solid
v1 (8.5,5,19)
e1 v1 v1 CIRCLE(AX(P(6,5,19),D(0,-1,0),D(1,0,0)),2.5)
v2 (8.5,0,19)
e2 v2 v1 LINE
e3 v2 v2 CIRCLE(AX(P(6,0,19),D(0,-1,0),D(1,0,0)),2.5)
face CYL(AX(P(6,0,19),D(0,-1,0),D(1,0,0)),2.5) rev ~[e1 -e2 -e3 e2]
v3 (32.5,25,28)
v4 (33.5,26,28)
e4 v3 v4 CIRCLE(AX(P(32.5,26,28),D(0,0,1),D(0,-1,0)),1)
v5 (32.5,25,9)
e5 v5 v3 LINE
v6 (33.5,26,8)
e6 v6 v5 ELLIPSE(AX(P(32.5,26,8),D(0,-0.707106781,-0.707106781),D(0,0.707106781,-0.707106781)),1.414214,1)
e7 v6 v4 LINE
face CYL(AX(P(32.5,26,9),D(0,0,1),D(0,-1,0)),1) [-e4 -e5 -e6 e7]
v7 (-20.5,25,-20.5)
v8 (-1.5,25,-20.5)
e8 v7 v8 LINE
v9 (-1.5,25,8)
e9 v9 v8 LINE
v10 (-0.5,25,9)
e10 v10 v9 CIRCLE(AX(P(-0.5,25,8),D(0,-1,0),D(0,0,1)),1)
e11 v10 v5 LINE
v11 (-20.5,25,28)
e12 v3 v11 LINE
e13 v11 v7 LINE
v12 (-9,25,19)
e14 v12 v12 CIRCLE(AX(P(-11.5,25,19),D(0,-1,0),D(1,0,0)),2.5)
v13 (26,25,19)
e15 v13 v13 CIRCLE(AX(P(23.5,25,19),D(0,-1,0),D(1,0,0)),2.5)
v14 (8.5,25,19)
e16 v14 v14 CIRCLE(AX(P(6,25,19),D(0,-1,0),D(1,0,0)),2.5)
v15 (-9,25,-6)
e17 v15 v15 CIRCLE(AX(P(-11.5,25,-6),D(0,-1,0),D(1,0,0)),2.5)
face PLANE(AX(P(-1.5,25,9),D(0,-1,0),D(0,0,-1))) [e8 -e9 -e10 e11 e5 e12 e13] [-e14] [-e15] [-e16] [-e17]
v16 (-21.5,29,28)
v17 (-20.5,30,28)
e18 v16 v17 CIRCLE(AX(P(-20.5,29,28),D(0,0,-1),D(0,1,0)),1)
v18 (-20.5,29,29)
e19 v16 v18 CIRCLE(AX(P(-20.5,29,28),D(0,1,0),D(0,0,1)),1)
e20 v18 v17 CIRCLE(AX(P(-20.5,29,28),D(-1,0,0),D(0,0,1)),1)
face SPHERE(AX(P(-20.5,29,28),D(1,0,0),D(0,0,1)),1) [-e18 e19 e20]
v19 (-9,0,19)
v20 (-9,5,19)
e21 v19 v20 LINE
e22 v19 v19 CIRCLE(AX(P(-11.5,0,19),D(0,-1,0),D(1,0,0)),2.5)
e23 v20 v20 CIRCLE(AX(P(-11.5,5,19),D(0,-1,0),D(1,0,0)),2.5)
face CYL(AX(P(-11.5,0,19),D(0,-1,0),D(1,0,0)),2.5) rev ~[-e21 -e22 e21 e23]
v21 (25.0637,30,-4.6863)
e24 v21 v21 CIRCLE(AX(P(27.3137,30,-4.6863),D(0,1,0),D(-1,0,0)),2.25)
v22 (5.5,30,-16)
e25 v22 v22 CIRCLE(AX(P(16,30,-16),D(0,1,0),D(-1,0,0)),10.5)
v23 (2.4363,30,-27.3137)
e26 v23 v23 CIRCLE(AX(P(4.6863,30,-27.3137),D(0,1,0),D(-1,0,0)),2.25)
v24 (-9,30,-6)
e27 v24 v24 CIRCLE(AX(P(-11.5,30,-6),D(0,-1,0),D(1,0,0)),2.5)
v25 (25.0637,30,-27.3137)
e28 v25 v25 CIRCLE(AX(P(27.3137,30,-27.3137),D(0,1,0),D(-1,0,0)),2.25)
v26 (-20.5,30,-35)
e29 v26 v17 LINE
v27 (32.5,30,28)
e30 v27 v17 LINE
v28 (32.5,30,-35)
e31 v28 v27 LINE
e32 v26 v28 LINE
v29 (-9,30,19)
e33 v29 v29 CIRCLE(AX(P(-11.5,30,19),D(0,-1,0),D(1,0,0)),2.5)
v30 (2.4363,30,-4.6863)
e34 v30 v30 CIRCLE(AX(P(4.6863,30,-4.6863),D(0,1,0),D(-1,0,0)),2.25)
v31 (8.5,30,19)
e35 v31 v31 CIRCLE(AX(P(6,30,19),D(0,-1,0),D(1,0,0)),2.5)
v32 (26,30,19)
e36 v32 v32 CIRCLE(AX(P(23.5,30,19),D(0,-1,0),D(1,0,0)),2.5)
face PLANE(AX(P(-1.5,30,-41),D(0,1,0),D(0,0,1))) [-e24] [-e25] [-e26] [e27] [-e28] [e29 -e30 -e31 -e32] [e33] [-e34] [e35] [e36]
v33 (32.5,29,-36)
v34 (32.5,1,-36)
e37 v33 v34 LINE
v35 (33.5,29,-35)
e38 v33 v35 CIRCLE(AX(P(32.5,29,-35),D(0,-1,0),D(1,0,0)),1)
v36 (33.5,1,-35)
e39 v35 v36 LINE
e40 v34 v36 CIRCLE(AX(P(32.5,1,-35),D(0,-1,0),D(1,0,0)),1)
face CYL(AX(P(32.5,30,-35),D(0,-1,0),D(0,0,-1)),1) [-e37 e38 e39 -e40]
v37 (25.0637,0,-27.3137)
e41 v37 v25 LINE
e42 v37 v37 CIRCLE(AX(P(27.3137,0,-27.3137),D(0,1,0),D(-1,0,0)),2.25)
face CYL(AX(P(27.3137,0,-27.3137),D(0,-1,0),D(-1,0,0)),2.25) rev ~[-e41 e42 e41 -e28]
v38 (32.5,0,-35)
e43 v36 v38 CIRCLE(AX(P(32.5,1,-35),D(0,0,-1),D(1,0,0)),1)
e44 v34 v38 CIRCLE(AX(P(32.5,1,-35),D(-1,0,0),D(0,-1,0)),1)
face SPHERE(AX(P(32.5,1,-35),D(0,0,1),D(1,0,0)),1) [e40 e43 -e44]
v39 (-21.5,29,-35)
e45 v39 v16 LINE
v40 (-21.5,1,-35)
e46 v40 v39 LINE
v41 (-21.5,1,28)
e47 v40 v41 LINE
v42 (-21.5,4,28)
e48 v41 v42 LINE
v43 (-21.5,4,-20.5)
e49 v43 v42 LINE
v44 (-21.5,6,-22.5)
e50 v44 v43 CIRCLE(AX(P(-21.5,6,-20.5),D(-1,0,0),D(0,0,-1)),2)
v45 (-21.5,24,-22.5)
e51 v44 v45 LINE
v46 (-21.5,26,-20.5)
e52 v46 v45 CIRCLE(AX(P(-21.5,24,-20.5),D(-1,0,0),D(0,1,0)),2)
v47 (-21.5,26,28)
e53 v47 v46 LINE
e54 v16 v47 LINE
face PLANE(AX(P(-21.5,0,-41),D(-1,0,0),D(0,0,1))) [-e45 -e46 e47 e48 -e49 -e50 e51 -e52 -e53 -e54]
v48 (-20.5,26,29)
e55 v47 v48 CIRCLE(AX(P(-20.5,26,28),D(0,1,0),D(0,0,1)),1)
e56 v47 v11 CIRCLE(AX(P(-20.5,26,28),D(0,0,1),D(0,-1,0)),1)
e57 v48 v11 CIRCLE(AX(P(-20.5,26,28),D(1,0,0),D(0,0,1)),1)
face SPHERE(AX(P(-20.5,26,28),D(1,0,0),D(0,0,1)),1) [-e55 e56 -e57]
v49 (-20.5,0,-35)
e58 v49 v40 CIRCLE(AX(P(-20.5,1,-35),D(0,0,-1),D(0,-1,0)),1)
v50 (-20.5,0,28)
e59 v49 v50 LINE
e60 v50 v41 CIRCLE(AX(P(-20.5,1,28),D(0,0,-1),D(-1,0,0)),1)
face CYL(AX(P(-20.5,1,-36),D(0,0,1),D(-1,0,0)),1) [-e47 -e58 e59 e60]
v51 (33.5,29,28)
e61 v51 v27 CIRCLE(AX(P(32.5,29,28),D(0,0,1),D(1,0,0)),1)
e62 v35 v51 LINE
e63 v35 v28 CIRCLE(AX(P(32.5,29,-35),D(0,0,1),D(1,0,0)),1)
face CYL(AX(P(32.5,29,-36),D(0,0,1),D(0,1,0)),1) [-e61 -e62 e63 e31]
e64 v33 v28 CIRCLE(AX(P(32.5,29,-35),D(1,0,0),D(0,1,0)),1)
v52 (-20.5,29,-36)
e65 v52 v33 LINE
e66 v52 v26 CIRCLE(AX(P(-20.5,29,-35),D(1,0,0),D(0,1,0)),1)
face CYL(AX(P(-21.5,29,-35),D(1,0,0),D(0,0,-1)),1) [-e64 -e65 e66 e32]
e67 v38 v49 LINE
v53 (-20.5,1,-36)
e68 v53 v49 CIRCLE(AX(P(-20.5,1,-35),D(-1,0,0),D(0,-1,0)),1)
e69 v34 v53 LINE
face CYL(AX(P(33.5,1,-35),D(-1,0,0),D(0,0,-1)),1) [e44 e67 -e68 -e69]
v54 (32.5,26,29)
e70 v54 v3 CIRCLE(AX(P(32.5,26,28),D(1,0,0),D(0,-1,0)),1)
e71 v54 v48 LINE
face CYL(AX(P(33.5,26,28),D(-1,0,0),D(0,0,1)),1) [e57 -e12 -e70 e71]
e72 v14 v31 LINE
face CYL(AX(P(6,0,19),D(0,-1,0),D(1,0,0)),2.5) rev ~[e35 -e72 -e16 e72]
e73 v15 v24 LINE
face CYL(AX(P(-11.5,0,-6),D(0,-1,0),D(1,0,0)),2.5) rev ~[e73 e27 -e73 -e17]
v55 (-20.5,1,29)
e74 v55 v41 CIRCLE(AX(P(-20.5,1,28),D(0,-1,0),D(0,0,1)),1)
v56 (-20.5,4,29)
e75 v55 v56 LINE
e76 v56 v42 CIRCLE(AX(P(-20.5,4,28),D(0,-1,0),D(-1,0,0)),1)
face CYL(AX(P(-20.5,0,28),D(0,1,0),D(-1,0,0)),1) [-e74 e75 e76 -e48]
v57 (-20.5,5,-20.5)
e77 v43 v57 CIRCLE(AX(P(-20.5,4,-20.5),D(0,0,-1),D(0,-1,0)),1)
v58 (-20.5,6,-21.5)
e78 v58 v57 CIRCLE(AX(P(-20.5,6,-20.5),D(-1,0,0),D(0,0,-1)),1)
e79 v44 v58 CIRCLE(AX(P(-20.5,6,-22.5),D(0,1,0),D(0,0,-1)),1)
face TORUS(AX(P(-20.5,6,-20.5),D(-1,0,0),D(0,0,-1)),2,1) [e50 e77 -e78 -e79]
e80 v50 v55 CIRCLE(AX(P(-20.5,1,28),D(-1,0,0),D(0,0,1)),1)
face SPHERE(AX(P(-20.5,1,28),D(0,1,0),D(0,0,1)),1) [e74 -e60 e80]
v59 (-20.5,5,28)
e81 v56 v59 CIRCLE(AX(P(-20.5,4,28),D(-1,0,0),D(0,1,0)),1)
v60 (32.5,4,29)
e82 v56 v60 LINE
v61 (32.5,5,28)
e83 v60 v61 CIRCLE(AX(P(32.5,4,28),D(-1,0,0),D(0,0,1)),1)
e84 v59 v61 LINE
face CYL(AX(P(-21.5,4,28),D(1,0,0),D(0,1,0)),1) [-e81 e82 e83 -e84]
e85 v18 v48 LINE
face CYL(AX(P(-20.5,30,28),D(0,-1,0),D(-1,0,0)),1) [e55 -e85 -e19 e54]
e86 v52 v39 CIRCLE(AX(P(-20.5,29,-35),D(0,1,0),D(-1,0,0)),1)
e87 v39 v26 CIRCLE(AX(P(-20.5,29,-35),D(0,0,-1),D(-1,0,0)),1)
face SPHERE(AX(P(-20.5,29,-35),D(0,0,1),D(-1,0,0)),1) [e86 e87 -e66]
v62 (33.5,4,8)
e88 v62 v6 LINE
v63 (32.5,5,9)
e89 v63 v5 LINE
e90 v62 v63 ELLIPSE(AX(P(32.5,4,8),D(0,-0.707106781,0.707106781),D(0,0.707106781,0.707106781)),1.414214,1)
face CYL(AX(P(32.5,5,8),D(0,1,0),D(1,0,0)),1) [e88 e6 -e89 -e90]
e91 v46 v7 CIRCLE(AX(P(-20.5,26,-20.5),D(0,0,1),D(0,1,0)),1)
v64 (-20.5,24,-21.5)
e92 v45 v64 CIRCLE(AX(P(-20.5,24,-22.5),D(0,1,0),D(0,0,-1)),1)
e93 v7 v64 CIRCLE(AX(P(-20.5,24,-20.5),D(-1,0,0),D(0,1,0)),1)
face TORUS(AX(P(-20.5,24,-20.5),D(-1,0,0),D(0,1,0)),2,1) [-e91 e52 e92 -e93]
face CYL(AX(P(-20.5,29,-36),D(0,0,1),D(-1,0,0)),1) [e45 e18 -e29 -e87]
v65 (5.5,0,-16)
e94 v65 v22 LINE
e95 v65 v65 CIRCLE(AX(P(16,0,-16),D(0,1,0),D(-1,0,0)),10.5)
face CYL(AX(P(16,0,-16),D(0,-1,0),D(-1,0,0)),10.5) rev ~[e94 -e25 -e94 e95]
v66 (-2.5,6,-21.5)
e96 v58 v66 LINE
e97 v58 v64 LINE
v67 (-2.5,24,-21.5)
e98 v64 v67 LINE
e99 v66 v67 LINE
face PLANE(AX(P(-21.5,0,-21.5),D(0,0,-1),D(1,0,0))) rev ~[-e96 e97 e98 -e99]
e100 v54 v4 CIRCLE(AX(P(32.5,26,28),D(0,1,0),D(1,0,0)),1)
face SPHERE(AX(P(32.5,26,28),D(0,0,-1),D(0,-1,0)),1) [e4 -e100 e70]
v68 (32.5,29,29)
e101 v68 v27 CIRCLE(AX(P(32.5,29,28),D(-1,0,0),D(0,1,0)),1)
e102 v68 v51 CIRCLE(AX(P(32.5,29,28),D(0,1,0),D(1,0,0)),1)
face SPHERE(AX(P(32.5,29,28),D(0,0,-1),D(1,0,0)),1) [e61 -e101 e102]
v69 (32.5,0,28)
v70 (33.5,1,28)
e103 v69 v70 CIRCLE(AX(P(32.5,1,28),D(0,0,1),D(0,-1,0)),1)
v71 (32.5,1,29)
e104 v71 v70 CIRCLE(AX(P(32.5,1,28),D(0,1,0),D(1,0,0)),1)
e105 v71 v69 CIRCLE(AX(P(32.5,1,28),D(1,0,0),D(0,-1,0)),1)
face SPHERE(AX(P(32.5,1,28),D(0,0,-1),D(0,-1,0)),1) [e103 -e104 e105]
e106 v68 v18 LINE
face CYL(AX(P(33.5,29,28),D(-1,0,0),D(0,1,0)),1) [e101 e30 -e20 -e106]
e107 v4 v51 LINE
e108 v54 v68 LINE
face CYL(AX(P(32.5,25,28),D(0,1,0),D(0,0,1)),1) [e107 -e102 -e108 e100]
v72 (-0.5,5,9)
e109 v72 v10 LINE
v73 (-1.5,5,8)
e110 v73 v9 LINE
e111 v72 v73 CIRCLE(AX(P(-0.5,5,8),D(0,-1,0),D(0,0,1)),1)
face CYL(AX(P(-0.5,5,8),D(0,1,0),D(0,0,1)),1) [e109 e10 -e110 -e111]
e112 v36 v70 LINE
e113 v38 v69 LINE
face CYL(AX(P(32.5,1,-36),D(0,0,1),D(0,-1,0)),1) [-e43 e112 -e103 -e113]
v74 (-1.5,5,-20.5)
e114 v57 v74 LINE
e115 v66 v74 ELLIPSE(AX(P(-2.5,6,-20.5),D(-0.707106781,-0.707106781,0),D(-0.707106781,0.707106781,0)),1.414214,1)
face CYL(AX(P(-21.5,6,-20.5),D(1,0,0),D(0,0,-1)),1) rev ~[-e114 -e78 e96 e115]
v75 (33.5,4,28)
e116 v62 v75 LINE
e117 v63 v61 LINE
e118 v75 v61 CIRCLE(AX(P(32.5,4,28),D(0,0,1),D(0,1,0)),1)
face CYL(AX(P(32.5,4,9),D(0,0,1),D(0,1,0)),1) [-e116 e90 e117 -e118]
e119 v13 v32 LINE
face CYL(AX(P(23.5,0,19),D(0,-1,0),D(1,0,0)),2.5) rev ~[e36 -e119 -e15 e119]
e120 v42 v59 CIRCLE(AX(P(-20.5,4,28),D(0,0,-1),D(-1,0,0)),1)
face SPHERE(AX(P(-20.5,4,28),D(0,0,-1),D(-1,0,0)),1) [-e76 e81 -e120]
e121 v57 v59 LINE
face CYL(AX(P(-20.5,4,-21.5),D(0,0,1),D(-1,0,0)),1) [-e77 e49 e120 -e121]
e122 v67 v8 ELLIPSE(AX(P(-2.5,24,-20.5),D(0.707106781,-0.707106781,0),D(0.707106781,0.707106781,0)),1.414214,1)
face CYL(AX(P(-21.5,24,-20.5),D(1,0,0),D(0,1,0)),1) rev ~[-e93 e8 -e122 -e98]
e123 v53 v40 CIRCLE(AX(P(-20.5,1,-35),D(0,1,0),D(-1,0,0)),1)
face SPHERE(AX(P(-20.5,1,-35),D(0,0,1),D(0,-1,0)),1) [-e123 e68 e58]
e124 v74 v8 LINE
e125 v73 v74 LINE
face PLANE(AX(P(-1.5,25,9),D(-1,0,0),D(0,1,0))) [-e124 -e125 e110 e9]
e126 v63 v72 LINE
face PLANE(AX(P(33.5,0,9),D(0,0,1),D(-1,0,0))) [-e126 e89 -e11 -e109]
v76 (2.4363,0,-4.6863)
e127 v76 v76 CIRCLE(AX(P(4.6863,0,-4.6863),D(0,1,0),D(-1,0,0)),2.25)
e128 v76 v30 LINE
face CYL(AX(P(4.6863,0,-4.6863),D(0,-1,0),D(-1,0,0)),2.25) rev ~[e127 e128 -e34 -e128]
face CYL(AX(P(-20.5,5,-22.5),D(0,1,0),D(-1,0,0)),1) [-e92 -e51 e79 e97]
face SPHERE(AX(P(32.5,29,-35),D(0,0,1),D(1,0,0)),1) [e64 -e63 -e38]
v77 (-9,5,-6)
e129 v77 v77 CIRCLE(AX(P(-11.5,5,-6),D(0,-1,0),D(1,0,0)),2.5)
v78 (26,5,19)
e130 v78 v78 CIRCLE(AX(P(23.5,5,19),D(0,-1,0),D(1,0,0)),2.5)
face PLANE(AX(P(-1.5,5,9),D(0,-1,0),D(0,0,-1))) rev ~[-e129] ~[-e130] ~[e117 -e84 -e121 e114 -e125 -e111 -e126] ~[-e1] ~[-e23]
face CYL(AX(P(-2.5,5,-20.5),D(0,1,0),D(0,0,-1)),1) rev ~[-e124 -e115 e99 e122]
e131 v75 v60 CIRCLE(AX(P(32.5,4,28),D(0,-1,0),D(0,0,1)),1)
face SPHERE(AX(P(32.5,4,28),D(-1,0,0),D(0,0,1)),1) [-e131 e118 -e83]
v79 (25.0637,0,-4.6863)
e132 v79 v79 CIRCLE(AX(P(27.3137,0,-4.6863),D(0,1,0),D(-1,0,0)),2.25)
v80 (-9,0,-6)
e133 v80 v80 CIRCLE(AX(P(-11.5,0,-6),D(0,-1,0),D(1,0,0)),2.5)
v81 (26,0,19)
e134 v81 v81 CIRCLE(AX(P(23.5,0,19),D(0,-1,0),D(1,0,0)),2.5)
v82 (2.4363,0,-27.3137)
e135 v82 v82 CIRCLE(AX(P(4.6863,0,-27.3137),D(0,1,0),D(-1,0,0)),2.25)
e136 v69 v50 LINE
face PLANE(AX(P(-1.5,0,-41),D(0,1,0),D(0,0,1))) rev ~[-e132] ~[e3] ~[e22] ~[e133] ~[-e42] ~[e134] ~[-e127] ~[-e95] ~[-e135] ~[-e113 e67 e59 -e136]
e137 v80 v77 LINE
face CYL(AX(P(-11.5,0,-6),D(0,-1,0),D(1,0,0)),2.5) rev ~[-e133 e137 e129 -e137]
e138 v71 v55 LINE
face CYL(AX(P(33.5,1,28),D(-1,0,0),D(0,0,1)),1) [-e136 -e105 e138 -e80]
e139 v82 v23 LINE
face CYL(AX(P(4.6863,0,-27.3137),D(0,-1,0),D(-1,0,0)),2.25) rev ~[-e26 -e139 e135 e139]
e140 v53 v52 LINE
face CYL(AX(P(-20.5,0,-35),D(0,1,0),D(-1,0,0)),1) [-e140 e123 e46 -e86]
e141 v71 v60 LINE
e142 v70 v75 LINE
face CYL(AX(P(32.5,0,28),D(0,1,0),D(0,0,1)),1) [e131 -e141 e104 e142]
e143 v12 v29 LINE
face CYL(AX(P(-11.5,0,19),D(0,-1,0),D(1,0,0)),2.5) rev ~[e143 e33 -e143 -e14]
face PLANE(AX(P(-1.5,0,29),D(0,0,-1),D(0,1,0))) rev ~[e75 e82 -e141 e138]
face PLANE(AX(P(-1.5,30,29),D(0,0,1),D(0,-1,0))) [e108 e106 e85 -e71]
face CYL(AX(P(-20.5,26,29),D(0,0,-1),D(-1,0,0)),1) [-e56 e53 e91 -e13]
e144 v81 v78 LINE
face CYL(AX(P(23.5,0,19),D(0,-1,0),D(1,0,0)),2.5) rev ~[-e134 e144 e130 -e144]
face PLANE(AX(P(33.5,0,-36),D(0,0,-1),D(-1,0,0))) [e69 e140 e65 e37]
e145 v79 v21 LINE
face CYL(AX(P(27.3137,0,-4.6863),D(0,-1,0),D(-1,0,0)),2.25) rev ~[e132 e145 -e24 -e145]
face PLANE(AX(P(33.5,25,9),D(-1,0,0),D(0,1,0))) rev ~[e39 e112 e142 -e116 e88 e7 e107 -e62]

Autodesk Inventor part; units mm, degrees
ref_plane "YZ Plane" through (0, 0, 0) normal (1, 0, 0) x (0, 1, 0)
ref_plane "XZ Plane" through (0, 0, 0) normal (0, 1, 0) x (-1, 0, 0)
ref_plane "XY Plane" through (0, 0, 0) normal (0, 0, 1) x (1, 0, 0)
sketch "Sketch1" plane through (0, 0, 0) normal (0, 1, 0) x (-1, 0, 0)
  line L0 (-2, 0) -> (-30, 0)
  line L1 (-32, -2) -> (-32, -30)
  line L2 (-30, -32) -> (-2, -32)
  line L3 (0, -30) -> (0, -2)
  circle A0 centre (-16, -16) radius 10.5
  line L4 (1.5, -41) -> (-33.5, -41)
  line L5 (-33.5, -41) -> (-33.5, 9)
  line L6 (-33.5, 9) -> (1.5, 9)
  line L7 (1.5, 9) -> (1.5, -41)
  line L8 (1.5, -41) -> (-33.5, 9) construction
  line L9 (-33.5, -41) -> (1.5, 9) construction
  circle A1 centre (-16, -16) radius 16 construction
  line L10 (-2, -32) -> (0, -30)
  line L11 (0, -2) -> (-2, 0)
  line L12 (-30, 0) -> (-32, -2)
  line L13 (-30, -32) -> (-32, -30)
  line L14 (-16, -16) -> (0, 0) construction
  line L15 (-16, -16) -> (-32, 0) construction
  line L16 (-16, -16) -> (-32, -32) construction
  circle A2 centre (-27.3137, -27.3137) radius 2.25
  line L17 (-16, -16) -> (0, -32) construction
  circle A3 centre (-4.6863, -27.3137) radius 2.25
  circle A4 centre (-4.6863, -4.6863) radius 2.25
  circle A5 centre (-27.3137, -4.6863) radius 2.25
  line L18 (1.5, -41) -> (21.5, -41)
  line L19 (21.5, -41) -> (21.5, -21.5)
  line L20 (21.5, -21.5) -> (1.5, -21.5)
  line L21 (1.5, -21.5) -> (1.5, -41)
  point P0 (-33.5, -36)
  point P1 (1.5, -36)
  dimension "d0" = 32
  dimension "d1" = 32
  dimension "d2" = 21
  dimension "d3" = 16
  dimension "d4" = 16
  dimension "d5" = 35
  dimension "d6" = 50
  dimension "d10" = 32
  dimension "d15" = 2
  dimension "d16" = 2
  dimension "d17" = 2
  dimension "d18" = 2
  dimension "d19" = 2
  dimension "d20" = 2
  dimension "d21" = 2
  dimension "d22" = 2
  dimension "d56" = 4.5
  dimension "d57" = 4.5
  dimension "d58" = 4.5
  dimension "d59" = 4.5
  dimension "d63" = 20
  dimension "d64" = 19.5
extrude "Extrusion1" add sketch "Sketch1" along normal blind 30 contours L11 L3 L10 L2 L13 L1 L12 L0 | L4 L5 L6 L7
sketch "Sketch3" plane through (-1.5, 0, 9) normal (0, 0, 1) x (1, 0, 0)
  line L0 (35, 0) -> (35, 30) projected
  line L1 (0, 0) -> (35, 0)
  line L2 (35, 0) -> (35, 5)
  line L3 (35, 5) -> (0, 5)
  line L4 (0, 5) -> (0, 0)
  point P0 (1.5, 0)
  dimension "d27" = 5
extrude "Extrusion2" add sketch "Sketch3" along normal blind 20
sketch "Sketch4" plane through (-1.5, 0, -41) normal (-1, 0, 0) x (0, 0, 1)
  line L0 (0, 0) -> (0, 30) projected
  line L1 (50, 5) -> (70, 5) projected
  line L2 (0, 0) -> (70, 0)
  line L3 (70, 0) -> (70, 5)
  line L4 (70, 5) -> (0, 5)
  line L5 (0, 5) -> (0, 0)
  point P0 (41, 0)
extrude "Extrusion3" add sketch "Sketch4" along normal blind 20
sketch "Sketch5" plane through (-1.5, 30, 9) normal (0, 0, 1) x (1, 0, 0)
  line L0 (35, 0) -> (0, 0) projected
  line L1 (0, -25) -> (0, 0) projected
  line L2 (35, 0) -> (0, 0)
  line L3 (0, 0) -> (0, -5)
  line L4 (0, -5) -> (35, -5)
  line L5 (35, -5) -> (35, 0)
  point P0 (1.5, -30)
  dimension "d33" = 5
extrude "Extrusion4" add sketch "Sketch5" along normal blind 20
sketch "Sketch6" plane through (-1.5, 5, -41) normal (-1, 0, 0) x (0, 0, 1)
  line L0 (50, 20) -> (70, 20) projected
  line L1 (0, 0) -> (0, 25) projected
  line L2 (70, 20) -> (0, 20)
  line L3 (0, 20) -> (0, 25)
  line L4 (0, 25) -> (70, 25)
  line L5 (70, 25) -> (70, 20)
  point P0 (41, -5)
extrude "Extrusion5" add sketch "Sketch6" along normal blind 20
sketch "Sketch7" plane through (0, 0, 0) normal (0, -1, 0) x (1, 0, 0)
  circle A0 centre (-11.5, 19) radius 2.5
  circle A1 centre (6, 19) radius 2.5
  circle A2 centre (23.5, 19) radius 2.5
  circle A3 centre (-11.5, -6) radius 2.5
  line L0 (33.5, 29) -> (-21.5, 29) construction
  line L1 (33.5, -41) -> (33.5, 29) construction
  line L2 (-21.5, 29) -> (33.5, 29) construction
  line L3 (33.5, 29) -> (33.5, -41) construction
  line L4 (33.5, -41) -> (-21.5, -41) construction
  line L5 (-21.5, -41) -> (-21.5, 29) construction
  line L6 (-1.5, -41) -> (-21.5, -41) construction
  line L7 (-11.5, 19) -> (-21.5, 19) construction
  line L8 (-11.5, 19) -> (-11.5, 29) construction
  line L9 (-11.5, 19) -> (-11.5, -6) construction
  line L10 (-11.5, 19) -> (6, 19) construction
  line L11 (6, 19) -> (23.5, 19) construction
  line L12 (-21.5, -21.5) -> (-1.5, -21.5)
  line L13 (-1.5, -21.5) -> (-1.5, -41)
  point P0 (0, 0)
  dimension "d41" = 5
  dimension "d44" = 5
  dimension "d45" = 5
  dimension "d48" = 5
  dimension "d51" = 17.5
  dimension "d60" = 25
  dimension "d71" = 10
  dimension "d72" = 10
  dimension "d73" = 17.5
  dimension "d74" = 20
  dimension "d75" = 19.5
extrude "Extrusion6" cut sketch "Sketch7" against normal blind 30
extrude "Extrusion7" add sketch "Sketch1" along normal blind 25 contours L7 L20 L19 L18
sketch "Sketch9" plane through (33.5, 0, -41) normal (0, 0, -1) x (-1, 0, 0)
  line L0 (0, 0) -> (0, 5) projected
  line L1 (0, 0) -> (55, 0)
  line L2 (55, 0) -> (55, 30)
  line L3 (55, 30) -> (0, 30)
  line L4 (0, 30) -> (0, 0)
  point P0 (33.5, 0)
  dimension "d76" = 55
  dimension "d77" = 30
extrude "Extrusion8" cut sketch "Sketch9" against normal blind 5
fillet "Fillet3" radius 1 26 edges at (33.5, 0, -3.5) (33.5, 30, -3.5) (33.5, 15, 9) (33.5, 25, 19) (6, 25, 29) (33.5, 27.5, 29) (6, 30, 29) (-21.5, 27.5, 29) (-21.5, 25, 3.75) (-21.5, 30, -3.5) (-21.5, 15, -21.5) (-21.5, 5, 3.75) (-21.5, 2.5, 29) (6, 5, 29) (6, 0, 29) (-21.5, 0, -3.5) (33.5, 2.5, 29) (33.5, 15, -36) (6, 0, -36) (-21.5, 15, -36) (6, 30, -36) (-1.5, 15, 9) (-1.5, 15, -21.5) (-11.5, 25, -21.5) (-11.5, 5, -21.5) (33.5, 5, 19)
equation "\"d16\" = d15"
equation "\"d17\" = d15"
equation "\"d18\" = d17"
equation "\"d19\" = d15"
equation "\"d20\" = d19"
equation "\"d21\" = d15"
equation "\"d22\" = d21"
properties part number "bed_pulley_holder" material "Plastic, Opaque Black"
